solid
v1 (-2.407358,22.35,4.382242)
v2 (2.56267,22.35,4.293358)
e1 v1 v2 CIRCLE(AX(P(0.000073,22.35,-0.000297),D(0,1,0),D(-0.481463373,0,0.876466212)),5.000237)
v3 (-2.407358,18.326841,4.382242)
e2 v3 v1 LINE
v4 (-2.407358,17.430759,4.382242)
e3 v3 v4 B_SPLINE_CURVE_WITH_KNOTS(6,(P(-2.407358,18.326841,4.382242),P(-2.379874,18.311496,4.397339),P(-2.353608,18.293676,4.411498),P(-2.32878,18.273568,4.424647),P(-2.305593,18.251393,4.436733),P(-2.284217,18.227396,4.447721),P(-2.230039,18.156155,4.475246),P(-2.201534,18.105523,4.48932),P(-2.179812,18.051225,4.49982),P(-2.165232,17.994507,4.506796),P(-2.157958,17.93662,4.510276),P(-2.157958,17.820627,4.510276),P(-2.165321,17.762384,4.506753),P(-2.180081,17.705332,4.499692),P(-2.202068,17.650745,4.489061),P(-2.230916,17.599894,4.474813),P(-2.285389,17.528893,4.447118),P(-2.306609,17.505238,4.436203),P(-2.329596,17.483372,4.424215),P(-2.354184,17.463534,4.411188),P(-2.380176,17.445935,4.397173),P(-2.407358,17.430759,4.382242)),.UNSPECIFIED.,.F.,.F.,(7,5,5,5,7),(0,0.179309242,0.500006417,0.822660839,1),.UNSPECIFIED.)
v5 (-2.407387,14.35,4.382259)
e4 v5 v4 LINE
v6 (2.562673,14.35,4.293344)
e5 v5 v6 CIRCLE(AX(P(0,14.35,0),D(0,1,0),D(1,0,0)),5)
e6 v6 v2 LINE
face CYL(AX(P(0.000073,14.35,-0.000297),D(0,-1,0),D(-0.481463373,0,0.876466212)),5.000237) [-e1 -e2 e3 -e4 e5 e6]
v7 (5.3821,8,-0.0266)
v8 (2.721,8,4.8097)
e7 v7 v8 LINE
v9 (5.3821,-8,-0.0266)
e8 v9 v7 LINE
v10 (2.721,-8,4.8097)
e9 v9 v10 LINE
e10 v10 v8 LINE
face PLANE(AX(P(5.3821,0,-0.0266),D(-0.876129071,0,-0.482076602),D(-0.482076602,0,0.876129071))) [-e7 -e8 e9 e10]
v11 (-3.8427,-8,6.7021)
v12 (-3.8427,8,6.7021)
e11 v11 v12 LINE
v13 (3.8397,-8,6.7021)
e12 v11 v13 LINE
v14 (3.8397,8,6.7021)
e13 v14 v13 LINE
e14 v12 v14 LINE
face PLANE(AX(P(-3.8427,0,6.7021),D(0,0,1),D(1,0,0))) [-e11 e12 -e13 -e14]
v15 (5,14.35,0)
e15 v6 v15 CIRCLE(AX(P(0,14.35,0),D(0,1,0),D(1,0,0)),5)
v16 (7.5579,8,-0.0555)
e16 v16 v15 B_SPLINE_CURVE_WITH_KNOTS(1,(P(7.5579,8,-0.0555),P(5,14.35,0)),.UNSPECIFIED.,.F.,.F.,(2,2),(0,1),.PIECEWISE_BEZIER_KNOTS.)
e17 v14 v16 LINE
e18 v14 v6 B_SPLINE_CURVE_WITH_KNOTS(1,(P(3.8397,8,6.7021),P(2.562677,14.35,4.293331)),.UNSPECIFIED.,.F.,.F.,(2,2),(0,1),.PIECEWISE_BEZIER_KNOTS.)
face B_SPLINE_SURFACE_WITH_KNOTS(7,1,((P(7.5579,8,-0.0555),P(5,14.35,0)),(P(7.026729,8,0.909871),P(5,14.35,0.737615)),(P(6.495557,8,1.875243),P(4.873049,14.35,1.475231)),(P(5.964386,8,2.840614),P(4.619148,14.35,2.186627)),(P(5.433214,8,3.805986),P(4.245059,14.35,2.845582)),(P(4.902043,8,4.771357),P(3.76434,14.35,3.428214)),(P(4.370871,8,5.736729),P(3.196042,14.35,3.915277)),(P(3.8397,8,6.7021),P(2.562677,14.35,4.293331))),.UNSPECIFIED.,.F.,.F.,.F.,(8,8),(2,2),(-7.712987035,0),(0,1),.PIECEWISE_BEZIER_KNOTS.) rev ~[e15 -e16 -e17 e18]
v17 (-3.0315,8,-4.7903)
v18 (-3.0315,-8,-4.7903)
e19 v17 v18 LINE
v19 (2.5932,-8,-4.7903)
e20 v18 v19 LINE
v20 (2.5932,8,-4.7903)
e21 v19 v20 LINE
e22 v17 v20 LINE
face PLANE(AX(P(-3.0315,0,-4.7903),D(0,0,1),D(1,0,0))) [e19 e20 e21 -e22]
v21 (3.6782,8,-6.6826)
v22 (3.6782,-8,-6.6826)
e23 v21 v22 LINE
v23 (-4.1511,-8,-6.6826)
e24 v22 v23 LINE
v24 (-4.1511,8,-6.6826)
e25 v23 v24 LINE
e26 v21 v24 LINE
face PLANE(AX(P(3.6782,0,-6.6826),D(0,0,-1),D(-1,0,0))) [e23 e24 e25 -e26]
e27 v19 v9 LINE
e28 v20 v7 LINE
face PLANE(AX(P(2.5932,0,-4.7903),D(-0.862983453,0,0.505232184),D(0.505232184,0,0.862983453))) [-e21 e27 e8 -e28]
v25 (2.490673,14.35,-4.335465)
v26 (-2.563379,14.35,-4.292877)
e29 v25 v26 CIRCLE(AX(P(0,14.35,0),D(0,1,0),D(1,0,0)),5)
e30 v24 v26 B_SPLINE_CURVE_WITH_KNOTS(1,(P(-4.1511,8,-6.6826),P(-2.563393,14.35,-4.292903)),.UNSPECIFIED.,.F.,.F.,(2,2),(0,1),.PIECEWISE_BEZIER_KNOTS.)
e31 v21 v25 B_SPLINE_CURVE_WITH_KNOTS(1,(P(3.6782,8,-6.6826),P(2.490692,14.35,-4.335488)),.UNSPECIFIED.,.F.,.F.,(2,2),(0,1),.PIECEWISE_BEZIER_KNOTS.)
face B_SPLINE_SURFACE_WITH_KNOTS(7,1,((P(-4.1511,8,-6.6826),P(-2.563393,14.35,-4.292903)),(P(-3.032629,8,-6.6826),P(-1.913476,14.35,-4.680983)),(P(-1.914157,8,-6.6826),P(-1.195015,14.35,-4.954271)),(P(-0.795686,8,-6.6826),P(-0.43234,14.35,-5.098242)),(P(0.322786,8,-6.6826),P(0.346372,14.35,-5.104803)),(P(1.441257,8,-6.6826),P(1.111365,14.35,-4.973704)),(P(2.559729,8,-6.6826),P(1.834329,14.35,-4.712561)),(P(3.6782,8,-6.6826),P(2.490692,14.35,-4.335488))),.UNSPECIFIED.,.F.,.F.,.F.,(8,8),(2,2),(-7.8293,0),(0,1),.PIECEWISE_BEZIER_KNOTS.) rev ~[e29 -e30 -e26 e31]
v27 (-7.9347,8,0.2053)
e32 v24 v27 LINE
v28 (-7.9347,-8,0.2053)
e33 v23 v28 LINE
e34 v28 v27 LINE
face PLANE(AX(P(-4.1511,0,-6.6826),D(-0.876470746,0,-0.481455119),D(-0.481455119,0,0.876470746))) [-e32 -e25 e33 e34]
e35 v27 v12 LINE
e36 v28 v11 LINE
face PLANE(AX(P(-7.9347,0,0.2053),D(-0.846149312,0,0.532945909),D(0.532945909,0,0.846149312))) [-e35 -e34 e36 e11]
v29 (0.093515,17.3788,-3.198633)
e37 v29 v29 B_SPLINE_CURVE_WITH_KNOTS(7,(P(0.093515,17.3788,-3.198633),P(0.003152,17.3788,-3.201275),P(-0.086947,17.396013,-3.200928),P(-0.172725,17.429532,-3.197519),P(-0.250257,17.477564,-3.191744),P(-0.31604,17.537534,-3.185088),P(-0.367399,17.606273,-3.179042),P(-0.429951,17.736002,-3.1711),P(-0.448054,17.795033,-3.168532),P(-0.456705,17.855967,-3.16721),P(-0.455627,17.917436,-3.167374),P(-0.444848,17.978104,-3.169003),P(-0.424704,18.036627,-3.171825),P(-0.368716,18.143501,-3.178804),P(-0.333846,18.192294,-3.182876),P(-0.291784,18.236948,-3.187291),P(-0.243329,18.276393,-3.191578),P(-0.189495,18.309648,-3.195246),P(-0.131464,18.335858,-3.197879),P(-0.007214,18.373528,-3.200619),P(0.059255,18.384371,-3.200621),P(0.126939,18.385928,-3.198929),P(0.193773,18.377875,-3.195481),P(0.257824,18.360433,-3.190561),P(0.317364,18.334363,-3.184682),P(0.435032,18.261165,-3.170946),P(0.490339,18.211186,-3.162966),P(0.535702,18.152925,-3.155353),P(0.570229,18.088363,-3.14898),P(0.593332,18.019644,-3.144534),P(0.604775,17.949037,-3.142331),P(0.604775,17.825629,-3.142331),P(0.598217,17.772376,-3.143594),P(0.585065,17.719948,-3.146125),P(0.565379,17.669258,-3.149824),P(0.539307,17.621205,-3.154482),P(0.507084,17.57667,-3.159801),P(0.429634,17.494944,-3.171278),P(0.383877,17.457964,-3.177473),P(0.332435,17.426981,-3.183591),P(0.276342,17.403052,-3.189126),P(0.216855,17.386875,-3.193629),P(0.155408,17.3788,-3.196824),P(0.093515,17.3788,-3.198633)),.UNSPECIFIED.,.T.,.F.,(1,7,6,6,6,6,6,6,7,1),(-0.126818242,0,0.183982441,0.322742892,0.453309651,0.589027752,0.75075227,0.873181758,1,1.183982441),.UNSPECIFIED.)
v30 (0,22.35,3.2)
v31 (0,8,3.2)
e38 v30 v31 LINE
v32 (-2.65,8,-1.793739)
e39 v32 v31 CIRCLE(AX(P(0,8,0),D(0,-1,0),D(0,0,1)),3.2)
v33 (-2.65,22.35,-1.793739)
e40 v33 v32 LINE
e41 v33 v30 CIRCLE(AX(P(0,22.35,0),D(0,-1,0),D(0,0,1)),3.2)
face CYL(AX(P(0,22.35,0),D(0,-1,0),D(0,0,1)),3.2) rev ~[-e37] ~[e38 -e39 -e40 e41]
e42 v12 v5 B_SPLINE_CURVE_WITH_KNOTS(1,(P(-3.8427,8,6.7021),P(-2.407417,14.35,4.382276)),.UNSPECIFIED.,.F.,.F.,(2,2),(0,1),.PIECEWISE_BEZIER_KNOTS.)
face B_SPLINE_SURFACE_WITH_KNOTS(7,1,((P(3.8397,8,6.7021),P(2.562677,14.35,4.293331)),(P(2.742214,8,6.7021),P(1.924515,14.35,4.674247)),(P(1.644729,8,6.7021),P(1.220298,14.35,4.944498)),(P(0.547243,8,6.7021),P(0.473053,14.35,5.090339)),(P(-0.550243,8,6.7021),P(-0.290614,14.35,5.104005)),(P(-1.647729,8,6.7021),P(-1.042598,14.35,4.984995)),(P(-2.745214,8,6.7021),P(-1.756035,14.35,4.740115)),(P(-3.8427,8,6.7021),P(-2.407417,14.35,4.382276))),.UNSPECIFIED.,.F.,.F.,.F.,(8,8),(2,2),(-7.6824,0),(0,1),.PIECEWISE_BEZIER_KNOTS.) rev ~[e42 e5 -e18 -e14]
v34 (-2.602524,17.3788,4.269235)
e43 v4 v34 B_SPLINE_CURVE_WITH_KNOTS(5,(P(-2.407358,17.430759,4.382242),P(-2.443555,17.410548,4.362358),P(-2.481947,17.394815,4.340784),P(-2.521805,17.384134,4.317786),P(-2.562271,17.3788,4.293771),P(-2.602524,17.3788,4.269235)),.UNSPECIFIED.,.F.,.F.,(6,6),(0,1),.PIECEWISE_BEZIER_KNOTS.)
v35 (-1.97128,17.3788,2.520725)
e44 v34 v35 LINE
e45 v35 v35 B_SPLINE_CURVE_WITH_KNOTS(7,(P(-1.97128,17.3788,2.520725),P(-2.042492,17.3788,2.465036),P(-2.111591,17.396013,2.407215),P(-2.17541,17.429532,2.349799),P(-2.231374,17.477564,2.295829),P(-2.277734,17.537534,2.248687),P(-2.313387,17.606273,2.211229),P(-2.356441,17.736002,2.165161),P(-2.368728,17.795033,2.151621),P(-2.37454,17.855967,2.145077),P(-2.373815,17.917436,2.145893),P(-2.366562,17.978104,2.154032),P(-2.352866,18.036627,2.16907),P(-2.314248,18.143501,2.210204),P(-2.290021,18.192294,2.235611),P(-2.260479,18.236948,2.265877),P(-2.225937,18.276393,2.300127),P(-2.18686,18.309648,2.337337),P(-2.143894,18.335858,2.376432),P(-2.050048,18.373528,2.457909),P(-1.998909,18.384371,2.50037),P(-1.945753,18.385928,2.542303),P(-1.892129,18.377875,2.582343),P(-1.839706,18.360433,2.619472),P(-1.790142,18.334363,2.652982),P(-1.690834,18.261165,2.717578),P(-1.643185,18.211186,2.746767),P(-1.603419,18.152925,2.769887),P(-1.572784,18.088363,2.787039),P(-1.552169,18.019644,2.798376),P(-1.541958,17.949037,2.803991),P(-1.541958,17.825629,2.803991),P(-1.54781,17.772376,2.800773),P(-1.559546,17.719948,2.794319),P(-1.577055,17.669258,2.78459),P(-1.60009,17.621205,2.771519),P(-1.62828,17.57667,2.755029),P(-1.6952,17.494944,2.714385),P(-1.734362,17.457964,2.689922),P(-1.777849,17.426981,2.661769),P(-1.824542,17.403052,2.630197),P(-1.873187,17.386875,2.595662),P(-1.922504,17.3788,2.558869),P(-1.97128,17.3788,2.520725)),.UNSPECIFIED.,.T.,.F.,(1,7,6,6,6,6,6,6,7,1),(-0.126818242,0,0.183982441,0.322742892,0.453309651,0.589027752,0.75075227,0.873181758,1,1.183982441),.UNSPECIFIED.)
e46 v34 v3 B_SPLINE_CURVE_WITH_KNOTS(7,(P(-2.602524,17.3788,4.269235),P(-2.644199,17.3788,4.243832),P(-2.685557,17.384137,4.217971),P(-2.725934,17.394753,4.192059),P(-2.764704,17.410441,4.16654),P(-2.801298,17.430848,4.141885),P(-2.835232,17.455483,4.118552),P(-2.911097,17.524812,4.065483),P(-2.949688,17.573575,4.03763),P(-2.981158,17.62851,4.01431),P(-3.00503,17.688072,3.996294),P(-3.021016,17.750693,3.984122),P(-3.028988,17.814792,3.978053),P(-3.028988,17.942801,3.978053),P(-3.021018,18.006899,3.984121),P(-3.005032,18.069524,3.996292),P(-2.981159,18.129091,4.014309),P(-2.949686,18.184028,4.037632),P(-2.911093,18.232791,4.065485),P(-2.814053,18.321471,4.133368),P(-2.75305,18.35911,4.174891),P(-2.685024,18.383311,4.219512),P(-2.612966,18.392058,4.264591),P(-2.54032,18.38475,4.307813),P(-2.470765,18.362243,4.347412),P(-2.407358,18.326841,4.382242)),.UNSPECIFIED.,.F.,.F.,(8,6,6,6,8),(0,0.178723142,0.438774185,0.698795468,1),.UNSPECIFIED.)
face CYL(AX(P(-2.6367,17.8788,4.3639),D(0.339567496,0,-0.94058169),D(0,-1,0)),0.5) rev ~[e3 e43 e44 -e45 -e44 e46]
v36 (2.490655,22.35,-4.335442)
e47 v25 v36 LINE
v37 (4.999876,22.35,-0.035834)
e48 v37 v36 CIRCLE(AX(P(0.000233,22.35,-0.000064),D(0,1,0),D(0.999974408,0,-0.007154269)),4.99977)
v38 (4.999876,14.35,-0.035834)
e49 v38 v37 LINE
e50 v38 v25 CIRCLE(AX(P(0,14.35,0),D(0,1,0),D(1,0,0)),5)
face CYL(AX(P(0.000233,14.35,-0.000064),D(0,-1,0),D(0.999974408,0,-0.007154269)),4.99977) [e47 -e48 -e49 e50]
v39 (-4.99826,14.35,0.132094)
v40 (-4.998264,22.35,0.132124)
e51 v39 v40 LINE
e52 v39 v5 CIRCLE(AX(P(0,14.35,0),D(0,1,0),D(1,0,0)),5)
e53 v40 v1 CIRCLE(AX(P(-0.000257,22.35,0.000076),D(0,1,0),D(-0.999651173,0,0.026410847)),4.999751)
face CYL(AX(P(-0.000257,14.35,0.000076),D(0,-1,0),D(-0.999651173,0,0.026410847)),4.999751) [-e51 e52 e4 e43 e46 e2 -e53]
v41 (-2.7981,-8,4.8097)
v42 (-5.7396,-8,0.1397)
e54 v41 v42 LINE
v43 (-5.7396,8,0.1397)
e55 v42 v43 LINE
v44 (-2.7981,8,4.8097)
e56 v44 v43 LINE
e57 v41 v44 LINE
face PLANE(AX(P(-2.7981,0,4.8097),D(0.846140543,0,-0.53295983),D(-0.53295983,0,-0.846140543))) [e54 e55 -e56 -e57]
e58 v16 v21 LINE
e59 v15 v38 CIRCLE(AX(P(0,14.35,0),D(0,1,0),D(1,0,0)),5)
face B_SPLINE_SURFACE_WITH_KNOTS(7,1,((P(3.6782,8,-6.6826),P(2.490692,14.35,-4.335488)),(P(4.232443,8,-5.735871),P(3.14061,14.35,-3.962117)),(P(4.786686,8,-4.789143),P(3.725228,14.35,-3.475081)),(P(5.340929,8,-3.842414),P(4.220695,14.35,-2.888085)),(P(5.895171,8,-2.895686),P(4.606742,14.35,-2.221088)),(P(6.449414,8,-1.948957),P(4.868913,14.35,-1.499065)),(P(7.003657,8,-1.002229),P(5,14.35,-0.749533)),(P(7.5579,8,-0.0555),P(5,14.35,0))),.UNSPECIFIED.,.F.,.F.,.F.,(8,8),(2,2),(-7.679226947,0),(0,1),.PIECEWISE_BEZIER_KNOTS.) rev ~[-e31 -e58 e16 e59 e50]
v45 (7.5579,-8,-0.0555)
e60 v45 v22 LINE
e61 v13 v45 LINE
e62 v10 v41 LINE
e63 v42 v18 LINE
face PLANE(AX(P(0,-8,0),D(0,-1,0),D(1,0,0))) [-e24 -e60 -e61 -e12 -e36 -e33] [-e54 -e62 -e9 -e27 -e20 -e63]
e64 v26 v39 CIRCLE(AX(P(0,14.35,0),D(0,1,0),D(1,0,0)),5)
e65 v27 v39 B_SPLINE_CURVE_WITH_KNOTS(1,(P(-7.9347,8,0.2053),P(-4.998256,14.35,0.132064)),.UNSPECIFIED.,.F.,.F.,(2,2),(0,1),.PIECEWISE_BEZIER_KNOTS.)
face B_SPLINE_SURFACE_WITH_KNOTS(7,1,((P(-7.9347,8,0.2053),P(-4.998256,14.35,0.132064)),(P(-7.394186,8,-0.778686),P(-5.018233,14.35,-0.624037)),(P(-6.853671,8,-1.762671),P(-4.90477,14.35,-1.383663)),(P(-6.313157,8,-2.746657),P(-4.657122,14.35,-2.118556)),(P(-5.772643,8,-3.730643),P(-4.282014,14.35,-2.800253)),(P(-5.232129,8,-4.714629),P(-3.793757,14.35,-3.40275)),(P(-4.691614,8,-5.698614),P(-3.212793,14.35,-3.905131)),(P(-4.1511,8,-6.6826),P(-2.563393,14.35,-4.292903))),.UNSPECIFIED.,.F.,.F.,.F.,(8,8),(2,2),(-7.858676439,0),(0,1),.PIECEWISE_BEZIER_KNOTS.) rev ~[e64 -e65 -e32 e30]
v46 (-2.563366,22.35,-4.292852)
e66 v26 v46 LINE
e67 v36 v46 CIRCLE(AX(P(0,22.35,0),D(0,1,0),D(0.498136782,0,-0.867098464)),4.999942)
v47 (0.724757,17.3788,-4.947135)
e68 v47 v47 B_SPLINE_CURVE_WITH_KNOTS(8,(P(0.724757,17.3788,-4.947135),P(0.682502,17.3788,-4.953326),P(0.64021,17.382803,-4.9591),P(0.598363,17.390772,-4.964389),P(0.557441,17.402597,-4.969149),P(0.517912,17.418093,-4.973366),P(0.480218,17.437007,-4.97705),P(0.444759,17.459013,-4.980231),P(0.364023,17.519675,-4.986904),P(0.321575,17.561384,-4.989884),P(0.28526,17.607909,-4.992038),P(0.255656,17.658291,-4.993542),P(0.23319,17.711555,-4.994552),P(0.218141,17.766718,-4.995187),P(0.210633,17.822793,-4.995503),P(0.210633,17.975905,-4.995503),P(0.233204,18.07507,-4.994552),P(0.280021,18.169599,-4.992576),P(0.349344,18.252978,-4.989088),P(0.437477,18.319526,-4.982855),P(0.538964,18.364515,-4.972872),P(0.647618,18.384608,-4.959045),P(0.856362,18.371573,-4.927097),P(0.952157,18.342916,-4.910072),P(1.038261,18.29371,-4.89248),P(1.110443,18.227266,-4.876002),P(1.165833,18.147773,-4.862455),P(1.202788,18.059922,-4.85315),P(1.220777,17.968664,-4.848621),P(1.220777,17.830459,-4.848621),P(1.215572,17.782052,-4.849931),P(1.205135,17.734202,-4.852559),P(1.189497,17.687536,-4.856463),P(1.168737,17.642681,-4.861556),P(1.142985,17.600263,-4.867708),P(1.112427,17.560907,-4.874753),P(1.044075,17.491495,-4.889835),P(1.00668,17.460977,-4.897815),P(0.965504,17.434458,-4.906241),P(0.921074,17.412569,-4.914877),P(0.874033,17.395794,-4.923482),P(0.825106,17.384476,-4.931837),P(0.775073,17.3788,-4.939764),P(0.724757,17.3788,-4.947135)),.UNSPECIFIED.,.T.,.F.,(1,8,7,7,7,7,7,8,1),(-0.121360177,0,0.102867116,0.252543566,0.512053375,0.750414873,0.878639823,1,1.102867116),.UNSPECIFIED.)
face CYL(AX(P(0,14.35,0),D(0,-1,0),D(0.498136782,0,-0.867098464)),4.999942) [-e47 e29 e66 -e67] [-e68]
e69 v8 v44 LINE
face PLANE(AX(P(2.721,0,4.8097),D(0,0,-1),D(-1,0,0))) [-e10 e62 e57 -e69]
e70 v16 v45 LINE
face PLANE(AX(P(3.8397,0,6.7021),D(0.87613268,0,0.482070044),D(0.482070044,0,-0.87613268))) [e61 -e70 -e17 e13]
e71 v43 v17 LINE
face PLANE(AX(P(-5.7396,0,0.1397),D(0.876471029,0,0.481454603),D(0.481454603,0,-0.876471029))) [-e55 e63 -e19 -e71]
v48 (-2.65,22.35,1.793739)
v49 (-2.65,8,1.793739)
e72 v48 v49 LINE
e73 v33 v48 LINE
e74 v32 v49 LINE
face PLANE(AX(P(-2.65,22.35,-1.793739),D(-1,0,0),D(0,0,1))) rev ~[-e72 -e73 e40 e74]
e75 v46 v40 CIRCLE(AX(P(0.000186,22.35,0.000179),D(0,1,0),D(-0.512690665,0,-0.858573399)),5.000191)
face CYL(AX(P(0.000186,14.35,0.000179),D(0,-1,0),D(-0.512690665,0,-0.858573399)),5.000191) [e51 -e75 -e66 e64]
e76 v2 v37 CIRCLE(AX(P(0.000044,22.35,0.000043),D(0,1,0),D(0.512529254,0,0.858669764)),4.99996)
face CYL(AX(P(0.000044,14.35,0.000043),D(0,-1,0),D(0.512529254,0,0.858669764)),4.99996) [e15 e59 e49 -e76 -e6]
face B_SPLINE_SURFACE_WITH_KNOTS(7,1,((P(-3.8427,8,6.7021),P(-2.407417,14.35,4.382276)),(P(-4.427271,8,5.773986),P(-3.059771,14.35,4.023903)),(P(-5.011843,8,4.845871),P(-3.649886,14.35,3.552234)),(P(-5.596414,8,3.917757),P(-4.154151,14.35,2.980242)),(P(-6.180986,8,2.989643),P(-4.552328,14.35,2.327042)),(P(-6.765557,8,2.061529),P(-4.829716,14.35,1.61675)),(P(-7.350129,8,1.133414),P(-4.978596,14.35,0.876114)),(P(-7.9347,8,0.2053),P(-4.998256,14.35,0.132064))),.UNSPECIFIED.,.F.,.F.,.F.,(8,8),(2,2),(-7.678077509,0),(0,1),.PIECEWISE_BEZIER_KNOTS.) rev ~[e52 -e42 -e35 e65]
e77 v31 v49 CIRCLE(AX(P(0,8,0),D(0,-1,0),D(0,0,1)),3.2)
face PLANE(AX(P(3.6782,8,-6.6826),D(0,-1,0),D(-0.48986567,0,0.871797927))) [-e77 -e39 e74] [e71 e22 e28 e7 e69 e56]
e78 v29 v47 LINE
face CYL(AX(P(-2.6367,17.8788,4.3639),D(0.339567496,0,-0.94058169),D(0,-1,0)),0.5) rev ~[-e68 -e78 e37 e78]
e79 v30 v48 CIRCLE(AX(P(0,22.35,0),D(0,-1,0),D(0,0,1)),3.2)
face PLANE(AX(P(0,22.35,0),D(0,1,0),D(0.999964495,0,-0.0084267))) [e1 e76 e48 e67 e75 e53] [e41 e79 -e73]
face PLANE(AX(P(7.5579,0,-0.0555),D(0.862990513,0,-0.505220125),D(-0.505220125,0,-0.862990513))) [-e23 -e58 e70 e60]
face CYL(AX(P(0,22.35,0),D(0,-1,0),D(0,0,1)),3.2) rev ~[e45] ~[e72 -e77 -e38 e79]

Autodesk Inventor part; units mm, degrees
ref_plane "YZ Plane" through (0, 0, 0) normal (1, 0, 0) x (0, 1, 0)
ref_plane "XZ Plane" through (0, 0, 0) normal (0, 1, 0) x (-1, 0, 0)
ref_plane "XY Plane" through (0, 0, 0) normal (0, 0, 1) x (1, 0, 0)
sketch "Sketch1" plane through (0, 0, 0) normal (0, 1, 0) x (-1, 0, 0)
  line L0 (3.0315, -4.7903) -> (-2.5932, -4.7903)
  line L1 (-2.5932, -4.7903) -> (-5.3821, -0.0266)
  line L2 (-5.3821, -0.0266) -> (-2.721, 4.8097)
  line L3 (-2.721, 4.8097) -> (2.7981, 4.8097)
  line L4 (2.7981, 4.8097) -> (5.7396, 0.1397)
  line L5 (5.7396, 0.1397) -> (3.0315, -4.7903)
  line L6 (-7.5579, -0.0555) -> (-3.6782, -6.6826)
  line L7 (-3.6782, -6.6826) -> (4.1511, -6.6826)
  line L8 (4.1511, -6.6826) -> (7.9347, 0.2053)
  line L9 (7.9347, 0.2053) -> (3.8427, 6.7021)
  line L10 (3.8427, 6.7021) -> (-3.8397, 6.7021)
  line L11 (-3.8397, 6.7021) -> (-7.5579, -0.0555)
  line L12 (0.004, -1.2887) -> (0.004, -3.3542)
  dimension "d43" = 9.6
ref_plane "Work Plane1" through (0, 14.35, 0) normal (0, 1, 0) x (1, 0, 0)
sketch "Sketch3" plane through (0, 14.35, 0) normal (0, 1, 0) x (1, 0, 0)
  circle A0 centre (0, 0) radius 5
  dimension "d7" = 10
extrude "Extrusion3" add sketch "Sketch1" along normal blind 8
sketch "Sketch6" plane through (0, 8, 0) normal (0, 1, 0) x (1, 0, 0)
  line L0 (3.6782, 6.6826) -> (-4.1511, 6.6826) projected
  line L1 (-4.1511, 6.6826) -> (-7.9347, -0.2053) projected
  line L2 (-7.9347, -0.2053) -> (-3.8427, -6.7021) projected
  line L3 (-3.8427, -6.7021) -> (3.8397, -6.7021) projected
  line L4 (3.8397, -6.7021) -> (7.5579, 0.0555) projected
  line L5 (7.5579, 0.0555) -> (3.6782, 6.6826) projected
  line L6 (-3.0315, 4.7903) -> (2.5932, 4.7903) projected
  line L7 (2.5932, 4.7903) -> (5.3821, 0.0266) projected
  line L8 (5.3821, 0.0266) -> (2.721, -4.8097) projected
  line L9 (2.721, -4.8097) -> (-2.7981, -4.8097) projected
  line L10 (-2.7981, -4.8097) -> (-5.7396, -0.1397) projected
  line L11 (-5.7396, -0.1397) -> (-3.0315, 4.7903) projected
  point P0 (0, 0)
loft "Loft2" add profiles "Sketch3" section 1 edges at (-0.2365, 8, -6.6826) (-6.0429, 8, -3.2387) (-5.8887, 8, 3.4537) (-0.0015, 8, 6.7021) (5.6988, 8, 3.3233) (5.618, 8, -3.3691)
sketch "Sketch7" plane through (0, 14.35, 0) normal (0, 1, 0) x (0.9999645, 0, -0.0084267)
  arc A0 (2.5271, 4.3143) -> (-2.5271, 4.3143) centre (0, 0) ccw projected
  arc A1 (-2.5271, 4.3143) -> (-4.9992, -0.09) centre (0, 0) ccw projected
  arc A2 (-4.9992, -0.09) -> (-2.4442, -4.3618) centre (0, 0) ccw projected
  arc A3 (-2.4442, -4.3618) -> (2.5264, -4.3148) centre (0, 0) ccw projected
  arc A4 (2.5264, -4.3148) -> (5, -0.0063) centre (0, 0) ccw projected
  arc A5 (5, -0.0063) -> (2.5271, 4.3143) centre (0, 0) ccw projected
  point P0 (0, 0)
sketch "Sketch8" plane through (0, 0, 0) normal (0, -1, 0) x (1, 0, 0)
  line L0 (3.6782, -6.6826) -> (-4.1511, -6.6826) projected
  line L1 (7.5579, -0.0555) -> (3.6782, -6.6826) projected
  line L2 (3.8397, 6.7021) -> (7.5579, -0.0555) projected
  line L3 (-3.8427, 6.7021) -> (3.8397, 6.7021) projected
  line L4 (-7.9347, 0.2053) -> (-3.8427, 6.7021) projected
  line L5 (-4.1511, -6.6826) -> (-7.9347, 0.2053) projected
  line L6 (-3.0315, -4.7903) -> (2.5932, -4.7903) projected
  line L7 (-5.7396, 0.1397) -> (-3.0315, -4.7903) projected
  line L8 (-2.7981, 4.8097) -> (-5.7396, 0.1397) projected
  line L9 (2.721, 4.8097) -> (-2.7981, 4.8097) projected
  line L10 (5.3821, -0.0266) -> (2.721, 4.8097) projected
  line L11 (2.5932, -4.7903) -> (5.3821, -0.0266) projected
  point P0 (0, 0)
extrude "Extrusion4" add sketch "Sketch8" along normal blind 8
extrude "Extrusion5" add sketch "Sketch7" along normal blind 8
sketch "Sketch9" plane through (0, 22.35, 0) normal (0, 1, 0) x (1, 0, 0)
  point P0 (0, 0)
  point P1 (0, 0)
hole "Hole2" at (0, 22.35, 0) direction (0, -1, 0) diameter 6.4 end through all
ref_plane "Work Plane5" through (3.8397, 0, 6.7021) normal (-0.3395675, 0, 0.9405817) x (0, -1, 0)
sketch "Sketch10" plane through (3.8397, 0, 6.7021) normal (-0.3395675, 0, 0.9405817) x (0, -1, 0)
  point P0 (0, -5.8873)
  point P1 (-17.8788, -6.8855)
hole "Hole3" at (-2.6367, 17.8788, 4.3639) direction (0.3395675, 0, -0.9405817) diameter 1 end through all
sketch "Sketch11" plane through (0, 22.35, 0) normal (0, 1, 0) x (1, 0, 0)
  line L0 (-2.65, 7.87) -> (-2.65, -12.0471)
  circle A0 centre (0, 0) radius 3.2 projected
  line L1 (3.05, 2.2452) -> (3.05, -2.0886)
  point P0 (0, 0)
  point P1 (-2.65, -1.7937)
  point P2 (-2.65, 1.7937)
  dimension "d52" = 3.05
  dimension "d53" = 5.7
extrude "Extrusion6" add sketch "Sketch11" against normal up to surface (14.35 mm away) contours L0 A0
properties part number "motorattacher"
